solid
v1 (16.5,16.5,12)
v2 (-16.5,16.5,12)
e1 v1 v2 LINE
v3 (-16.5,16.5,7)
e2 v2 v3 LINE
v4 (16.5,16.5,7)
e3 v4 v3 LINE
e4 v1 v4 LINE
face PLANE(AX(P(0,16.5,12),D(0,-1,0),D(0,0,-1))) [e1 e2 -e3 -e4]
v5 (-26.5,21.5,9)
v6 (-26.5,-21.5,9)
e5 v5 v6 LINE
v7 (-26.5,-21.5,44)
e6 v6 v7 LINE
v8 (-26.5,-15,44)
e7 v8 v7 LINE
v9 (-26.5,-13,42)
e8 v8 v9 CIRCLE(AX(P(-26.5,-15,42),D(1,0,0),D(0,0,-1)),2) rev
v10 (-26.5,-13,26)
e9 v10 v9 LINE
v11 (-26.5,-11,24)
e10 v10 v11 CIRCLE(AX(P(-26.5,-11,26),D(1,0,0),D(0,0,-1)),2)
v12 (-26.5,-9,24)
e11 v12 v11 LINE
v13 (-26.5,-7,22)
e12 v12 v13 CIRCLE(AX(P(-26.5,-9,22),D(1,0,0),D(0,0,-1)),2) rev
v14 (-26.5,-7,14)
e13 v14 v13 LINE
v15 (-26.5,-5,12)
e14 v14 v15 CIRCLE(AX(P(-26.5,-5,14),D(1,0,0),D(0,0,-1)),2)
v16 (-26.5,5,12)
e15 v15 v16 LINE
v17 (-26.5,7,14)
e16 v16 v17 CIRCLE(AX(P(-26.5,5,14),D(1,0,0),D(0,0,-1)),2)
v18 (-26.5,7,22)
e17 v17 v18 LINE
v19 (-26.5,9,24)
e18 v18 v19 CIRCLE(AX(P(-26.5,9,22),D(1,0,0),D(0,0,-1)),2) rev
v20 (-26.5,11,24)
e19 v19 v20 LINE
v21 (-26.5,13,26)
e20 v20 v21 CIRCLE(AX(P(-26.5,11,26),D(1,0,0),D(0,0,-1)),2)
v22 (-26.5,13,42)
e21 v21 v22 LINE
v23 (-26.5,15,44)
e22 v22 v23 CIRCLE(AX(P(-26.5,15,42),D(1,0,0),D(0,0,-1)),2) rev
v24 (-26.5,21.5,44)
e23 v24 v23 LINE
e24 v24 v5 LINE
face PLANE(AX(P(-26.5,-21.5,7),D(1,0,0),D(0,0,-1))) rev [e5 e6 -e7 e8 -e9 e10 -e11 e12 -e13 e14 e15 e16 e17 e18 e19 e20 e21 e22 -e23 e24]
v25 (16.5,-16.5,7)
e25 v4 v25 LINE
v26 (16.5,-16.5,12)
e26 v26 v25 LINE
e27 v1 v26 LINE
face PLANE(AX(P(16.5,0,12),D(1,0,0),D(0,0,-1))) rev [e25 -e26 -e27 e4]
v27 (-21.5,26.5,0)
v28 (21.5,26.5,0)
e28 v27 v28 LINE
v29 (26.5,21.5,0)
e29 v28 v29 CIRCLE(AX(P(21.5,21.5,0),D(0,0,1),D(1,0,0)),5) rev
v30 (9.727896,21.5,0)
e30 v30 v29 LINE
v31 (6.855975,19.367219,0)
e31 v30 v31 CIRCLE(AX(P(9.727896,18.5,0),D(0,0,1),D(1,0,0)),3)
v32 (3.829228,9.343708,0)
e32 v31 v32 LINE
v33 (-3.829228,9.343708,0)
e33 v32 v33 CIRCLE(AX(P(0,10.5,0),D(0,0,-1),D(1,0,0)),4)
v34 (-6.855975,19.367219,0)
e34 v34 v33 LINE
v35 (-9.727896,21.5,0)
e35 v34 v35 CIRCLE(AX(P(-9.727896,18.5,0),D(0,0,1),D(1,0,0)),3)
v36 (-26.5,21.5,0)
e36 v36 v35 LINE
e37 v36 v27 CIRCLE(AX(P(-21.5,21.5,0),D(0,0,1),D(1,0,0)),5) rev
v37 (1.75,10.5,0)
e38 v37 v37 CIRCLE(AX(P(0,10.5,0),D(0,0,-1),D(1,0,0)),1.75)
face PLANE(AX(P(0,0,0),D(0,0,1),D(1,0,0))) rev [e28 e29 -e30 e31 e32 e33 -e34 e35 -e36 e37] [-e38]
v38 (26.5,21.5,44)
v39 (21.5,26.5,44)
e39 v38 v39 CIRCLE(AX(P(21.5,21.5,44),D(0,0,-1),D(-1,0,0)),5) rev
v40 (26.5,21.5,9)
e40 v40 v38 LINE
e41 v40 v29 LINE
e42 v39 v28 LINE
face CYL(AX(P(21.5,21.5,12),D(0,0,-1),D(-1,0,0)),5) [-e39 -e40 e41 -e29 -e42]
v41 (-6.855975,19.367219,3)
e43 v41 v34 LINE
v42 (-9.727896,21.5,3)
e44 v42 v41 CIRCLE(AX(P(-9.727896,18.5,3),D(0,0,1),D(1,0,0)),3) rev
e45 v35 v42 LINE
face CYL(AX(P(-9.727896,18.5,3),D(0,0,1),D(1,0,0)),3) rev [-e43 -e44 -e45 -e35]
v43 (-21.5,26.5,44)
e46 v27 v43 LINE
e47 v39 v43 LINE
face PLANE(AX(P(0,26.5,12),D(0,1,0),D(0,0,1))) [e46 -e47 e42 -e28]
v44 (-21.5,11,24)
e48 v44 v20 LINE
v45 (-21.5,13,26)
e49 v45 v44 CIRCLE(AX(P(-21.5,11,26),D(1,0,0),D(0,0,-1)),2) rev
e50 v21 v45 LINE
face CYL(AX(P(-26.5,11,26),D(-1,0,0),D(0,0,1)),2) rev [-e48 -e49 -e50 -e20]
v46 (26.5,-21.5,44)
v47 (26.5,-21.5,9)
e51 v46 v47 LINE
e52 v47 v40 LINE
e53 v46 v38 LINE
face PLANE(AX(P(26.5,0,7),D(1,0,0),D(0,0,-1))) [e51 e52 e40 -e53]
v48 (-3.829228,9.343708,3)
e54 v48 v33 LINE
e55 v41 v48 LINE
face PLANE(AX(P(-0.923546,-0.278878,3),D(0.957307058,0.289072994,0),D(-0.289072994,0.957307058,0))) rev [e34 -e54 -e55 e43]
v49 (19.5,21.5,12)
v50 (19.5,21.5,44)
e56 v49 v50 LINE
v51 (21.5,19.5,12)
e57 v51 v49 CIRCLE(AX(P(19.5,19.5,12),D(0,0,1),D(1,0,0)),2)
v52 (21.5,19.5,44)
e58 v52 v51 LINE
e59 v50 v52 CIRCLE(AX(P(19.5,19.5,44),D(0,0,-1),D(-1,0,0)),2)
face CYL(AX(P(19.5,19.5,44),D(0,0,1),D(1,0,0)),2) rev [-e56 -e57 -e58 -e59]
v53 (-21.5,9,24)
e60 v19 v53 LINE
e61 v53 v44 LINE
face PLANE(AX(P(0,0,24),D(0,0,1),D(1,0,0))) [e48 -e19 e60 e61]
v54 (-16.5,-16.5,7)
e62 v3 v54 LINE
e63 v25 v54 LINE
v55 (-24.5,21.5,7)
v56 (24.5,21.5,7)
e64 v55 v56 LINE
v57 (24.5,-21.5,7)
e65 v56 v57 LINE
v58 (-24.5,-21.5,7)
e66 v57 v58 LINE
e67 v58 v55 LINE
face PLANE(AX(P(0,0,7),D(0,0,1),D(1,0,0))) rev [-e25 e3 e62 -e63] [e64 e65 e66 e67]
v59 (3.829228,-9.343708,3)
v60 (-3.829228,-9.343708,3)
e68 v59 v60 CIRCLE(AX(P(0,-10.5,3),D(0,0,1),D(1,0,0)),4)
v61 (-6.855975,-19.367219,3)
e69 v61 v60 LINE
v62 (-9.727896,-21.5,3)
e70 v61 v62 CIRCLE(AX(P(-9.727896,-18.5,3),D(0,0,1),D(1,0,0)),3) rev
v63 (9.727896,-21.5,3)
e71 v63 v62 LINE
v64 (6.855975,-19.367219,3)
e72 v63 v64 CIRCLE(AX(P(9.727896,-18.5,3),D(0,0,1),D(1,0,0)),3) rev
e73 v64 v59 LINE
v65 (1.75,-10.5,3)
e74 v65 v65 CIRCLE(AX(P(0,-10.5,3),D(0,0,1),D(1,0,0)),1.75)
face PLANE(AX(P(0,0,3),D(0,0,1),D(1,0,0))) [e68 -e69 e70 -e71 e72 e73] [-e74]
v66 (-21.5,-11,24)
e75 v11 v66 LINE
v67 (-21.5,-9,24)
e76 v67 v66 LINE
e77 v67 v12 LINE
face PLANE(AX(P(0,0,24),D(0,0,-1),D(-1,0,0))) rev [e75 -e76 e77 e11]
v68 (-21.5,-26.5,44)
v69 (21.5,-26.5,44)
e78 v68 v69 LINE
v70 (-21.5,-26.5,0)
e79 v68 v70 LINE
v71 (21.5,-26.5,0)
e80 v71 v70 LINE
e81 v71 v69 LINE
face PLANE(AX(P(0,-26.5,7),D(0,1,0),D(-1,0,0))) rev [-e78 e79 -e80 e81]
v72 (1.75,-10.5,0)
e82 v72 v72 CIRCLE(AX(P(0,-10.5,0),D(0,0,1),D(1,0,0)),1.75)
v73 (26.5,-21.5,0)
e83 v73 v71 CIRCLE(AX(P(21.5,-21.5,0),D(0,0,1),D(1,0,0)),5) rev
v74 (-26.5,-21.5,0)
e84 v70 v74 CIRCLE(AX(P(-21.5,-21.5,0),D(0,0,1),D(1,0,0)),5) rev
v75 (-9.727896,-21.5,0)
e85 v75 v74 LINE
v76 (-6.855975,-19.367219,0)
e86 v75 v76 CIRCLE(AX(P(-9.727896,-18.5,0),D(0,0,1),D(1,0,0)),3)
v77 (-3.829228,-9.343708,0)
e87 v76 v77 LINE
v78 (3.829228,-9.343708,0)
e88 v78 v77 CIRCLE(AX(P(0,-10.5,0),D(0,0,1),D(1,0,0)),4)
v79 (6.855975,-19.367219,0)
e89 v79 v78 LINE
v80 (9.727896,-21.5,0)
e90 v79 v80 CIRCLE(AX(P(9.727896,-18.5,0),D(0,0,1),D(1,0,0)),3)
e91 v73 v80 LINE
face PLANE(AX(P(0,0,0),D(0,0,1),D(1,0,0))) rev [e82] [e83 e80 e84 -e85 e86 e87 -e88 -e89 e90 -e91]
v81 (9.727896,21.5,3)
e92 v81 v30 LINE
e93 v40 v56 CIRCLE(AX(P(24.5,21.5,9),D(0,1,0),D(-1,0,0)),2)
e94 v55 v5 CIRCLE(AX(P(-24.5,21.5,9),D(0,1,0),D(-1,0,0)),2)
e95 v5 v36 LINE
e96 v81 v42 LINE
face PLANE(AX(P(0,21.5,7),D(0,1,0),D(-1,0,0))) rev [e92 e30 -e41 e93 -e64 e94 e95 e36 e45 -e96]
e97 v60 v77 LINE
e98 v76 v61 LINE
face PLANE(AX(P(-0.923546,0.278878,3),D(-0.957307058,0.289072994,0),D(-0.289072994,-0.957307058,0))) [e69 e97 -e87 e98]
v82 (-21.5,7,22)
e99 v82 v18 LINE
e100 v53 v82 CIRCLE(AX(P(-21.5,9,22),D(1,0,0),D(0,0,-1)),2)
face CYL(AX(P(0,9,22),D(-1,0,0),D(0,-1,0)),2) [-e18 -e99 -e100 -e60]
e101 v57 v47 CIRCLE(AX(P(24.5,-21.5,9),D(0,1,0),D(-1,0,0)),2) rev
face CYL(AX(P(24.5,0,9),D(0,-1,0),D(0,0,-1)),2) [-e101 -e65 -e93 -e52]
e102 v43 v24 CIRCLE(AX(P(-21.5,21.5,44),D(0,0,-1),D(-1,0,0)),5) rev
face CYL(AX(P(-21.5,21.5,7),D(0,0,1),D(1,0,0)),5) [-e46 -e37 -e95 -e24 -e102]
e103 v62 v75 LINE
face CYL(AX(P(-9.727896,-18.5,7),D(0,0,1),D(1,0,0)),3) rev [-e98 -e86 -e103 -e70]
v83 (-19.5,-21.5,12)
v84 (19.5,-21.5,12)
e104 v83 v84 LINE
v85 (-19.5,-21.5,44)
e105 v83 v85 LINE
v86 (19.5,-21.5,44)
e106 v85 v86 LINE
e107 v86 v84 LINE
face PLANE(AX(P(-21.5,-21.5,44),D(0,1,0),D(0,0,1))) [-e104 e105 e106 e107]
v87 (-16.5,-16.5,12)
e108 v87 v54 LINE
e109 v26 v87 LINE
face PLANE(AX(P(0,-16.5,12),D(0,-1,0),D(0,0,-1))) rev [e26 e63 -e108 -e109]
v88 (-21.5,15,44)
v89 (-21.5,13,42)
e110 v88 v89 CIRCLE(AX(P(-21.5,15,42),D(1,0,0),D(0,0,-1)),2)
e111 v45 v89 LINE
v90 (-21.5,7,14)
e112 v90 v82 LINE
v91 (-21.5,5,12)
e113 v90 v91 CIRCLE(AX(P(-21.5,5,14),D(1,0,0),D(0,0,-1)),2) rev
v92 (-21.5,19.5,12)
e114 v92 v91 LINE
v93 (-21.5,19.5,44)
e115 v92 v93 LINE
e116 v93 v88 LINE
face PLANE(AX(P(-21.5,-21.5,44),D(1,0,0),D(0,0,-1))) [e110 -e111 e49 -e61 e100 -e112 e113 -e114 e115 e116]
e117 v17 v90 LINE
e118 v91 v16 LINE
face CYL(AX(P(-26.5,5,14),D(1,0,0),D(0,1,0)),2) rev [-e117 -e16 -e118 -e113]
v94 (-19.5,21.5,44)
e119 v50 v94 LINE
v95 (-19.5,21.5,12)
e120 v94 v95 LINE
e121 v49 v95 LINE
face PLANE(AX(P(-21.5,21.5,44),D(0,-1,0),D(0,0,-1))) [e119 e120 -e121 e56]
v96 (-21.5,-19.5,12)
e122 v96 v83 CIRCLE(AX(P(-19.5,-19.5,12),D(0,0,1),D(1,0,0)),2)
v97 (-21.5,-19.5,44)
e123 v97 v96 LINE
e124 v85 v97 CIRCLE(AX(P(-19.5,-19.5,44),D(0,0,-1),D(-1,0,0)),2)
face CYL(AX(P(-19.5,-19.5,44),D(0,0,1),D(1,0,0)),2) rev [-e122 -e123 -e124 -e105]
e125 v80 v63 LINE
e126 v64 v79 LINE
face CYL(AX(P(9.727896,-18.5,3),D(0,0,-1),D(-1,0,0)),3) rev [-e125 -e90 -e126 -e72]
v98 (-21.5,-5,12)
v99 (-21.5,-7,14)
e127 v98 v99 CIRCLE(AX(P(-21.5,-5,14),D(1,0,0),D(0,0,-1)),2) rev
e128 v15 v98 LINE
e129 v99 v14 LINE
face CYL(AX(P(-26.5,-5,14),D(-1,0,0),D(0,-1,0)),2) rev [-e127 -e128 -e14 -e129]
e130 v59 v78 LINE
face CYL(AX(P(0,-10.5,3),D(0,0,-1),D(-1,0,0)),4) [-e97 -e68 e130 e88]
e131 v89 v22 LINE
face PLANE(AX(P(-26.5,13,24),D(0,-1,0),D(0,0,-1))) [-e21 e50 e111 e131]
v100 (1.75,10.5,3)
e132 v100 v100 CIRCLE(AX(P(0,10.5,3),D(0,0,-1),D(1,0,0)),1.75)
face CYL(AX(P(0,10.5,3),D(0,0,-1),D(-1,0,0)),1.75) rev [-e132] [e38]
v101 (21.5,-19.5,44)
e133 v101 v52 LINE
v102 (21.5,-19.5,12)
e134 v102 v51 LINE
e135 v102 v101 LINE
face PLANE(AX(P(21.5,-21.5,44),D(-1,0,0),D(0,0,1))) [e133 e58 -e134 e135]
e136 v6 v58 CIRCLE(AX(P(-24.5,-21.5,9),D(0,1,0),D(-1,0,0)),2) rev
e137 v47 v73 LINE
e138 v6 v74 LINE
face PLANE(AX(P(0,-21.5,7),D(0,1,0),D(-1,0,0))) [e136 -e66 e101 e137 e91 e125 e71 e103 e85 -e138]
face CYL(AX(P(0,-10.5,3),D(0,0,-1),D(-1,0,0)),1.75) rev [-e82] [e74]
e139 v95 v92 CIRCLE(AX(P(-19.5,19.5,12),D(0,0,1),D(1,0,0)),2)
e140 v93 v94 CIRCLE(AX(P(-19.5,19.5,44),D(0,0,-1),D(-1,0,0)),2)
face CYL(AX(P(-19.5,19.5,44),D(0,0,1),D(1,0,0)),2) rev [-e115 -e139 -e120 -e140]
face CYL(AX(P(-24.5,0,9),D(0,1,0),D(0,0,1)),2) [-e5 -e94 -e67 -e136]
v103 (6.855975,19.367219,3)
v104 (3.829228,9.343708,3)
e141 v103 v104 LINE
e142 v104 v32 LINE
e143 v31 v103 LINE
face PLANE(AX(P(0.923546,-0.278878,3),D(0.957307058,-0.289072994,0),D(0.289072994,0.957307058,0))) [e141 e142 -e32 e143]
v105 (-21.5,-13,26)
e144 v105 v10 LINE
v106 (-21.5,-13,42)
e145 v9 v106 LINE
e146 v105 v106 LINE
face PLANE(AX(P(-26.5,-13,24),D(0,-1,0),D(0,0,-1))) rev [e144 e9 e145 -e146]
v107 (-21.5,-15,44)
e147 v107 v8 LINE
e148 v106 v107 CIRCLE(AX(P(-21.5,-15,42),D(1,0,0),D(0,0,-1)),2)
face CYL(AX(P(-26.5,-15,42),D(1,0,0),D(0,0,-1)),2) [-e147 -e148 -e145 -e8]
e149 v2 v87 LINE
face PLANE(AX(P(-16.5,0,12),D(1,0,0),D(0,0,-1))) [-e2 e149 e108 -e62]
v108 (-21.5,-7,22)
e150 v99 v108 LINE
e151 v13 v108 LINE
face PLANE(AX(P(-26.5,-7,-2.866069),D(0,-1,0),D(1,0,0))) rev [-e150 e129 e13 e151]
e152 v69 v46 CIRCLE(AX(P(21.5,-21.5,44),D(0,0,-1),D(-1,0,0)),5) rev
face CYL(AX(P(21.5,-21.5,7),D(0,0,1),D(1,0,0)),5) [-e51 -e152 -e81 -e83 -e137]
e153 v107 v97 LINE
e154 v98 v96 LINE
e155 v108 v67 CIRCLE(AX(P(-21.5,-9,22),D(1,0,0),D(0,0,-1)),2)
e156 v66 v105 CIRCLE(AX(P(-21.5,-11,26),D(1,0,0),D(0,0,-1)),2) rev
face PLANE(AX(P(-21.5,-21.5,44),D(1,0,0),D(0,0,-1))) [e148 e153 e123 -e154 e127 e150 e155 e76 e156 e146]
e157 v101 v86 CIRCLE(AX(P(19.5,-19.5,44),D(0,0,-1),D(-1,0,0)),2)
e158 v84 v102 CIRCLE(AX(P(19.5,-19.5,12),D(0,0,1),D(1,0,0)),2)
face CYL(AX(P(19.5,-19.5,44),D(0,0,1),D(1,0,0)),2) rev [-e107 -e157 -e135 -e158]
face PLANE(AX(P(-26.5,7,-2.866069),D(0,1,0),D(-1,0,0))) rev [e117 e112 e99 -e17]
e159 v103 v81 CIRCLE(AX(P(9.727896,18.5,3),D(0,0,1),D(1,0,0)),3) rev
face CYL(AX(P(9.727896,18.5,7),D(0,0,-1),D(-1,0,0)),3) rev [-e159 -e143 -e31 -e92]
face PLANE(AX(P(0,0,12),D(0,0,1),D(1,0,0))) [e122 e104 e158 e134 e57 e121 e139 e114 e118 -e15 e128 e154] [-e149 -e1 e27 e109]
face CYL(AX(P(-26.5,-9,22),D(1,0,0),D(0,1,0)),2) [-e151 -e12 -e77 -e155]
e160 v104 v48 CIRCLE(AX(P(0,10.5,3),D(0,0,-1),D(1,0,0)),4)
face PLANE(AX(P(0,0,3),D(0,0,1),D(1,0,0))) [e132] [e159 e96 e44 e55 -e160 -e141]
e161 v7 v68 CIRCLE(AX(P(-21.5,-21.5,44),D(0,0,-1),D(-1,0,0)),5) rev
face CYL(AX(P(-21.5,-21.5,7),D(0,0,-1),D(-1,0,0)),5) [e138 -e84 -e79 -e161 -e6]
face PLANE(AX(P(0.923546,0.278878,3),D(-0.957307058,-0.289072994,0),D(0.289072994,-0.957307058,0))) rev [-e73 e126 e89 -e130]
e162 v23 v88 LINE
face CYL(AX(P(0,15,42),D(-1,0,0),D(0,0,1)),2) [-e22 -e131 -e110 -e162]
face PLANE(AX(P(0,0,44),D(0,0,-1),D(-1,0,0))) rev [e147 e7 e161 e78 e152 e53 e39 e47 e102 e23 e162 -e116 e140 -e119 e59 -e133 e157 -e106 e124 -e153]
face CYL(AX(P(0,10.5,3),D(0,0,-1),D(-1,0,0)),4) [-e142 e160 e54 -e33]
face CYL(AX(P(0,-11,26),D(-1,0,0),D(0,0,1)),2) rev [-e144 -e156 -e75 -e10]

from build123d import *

# Parameters (mm, degrees)
CROQUIS1_W                = 5
CROQUIS1_H                = 53
SALIENTE_EXTRUIR1_DEPTH   = 7
SALIENTE_EXTRUIR1_2_DEPTH = 7
CROQUIS3_W                = 53
CROQUIS3_H                = 48
CROQUIS3_W_2              = 33
CROQUIS3_H_2              = 33
CROQUIS3_H_3              = 5
SALIENTE_EXTRUIR2_DEPTH   = 5
CROQUIS4_W                = 53
CROQUIS4_H                = 53
CROQUIS4_W_2              = 43
CROQUIS4_H_2              = 43
SALIENTE_EXTRUIR3_DEPTH   = 32
REDONDEO1_R               = 2
REDONDEO2_R               = 5
CROQUIS5_W                = 5
CROQUIS5_H                = 14
CORTAR_EXTRUIR1_DEPTH     = 32
CROQUIS6_W                = 5
CROQUIS6_H                = 6
CORTAR_EXTRUIR2_DEPTH     = 20
REDONDEO3_R               = 2
CROQUIS7_R                = 4
CROQUIS7_R_2              = 1.75
SALIENTE_EXTRUIR4_DEPTH   = 3
REDONDEO4_R               = 3
REDONDEO7_R               = 3


with BuildPart() as part:
    # Croquis1 → Saliente-Extruir1 (new body)
    with BuildSketch(Plane(origin=(0, 0, 0), x_dir=(0, 1, 0), z_dir=(0, 0, 1))):
        with Locations((-24, 0)):
            Rectangle(CROQUIS1_W, CROQUIS1_H)
    extrude(amount=SALIENTE_EXTRUIR1_DEPTH)



with BuildPart() as body_2:
    # Croquis1 → Saliente-Extruir1 2 (new body)
    with BuildSketch(Plane(origin=(0, 0, 0), x_dir=(0, 1, 0), z_dir=(0, 0, 1))):
        with Locations((24, 0)):
            Rectangle(CROQUIS1_W, CROQUIS1_H)
    extrude(amount=SALIENTE_EXTRUIR1_2_DEPTH)


with BuildPart() as part_1:
    add(part.part)

    add(body_2.part)  # Saliente-Extruir2 merges body 2
    # Croquis3 → Saliente-Extruir2 (add)
    # profile 1 of 2: a face of its own
    with BuildSketch(Plane.XY.offset(7)):
        with Locations((0, 2.5)):
            Rectangle(CROQUIS3_W, CROQUIS3_H)
        Rectangle(CROQUIS3_W_2, CROQUIS3_H_2, mode=Mode.SUBTRACT)
    # profile 2 of 2: a face of its own
    with BuildSketch(Plane.XY.offset(7)):
        with Locations((0, -24)):
            Rectangle(CROQUIS3_W, CROQUIS3_H_3)
    extrude(amount=SALIENTE_EXTRUIR2_DEPTH)

    # Croquis4 → Saliente-Extruir3 (add)
    with BuildSketch(Plane.XY.offset(12)):
        Rectangle(CROQUIS4_W, CROQUIS4_H)
        Rectangle(CROQUIS4_W_2, CROQUIS4_H_2, mode=Mode.SUBTRACT)
    extrude(amount=SALIENTE_EXTRUIR3_DEPTH)

    # Redondeo1
    redondeo1_edges = [part_1.edges().sort_by_distance(p)[0] for p in [
        (21.5, 21.5, 28),
        (-21.5, 21.5, 28),
        (-21.5, -21.5, 28),
        (21.5, -21.5, 28),
    ]]
    fillet(redondeo1_edges, radius=REDONDEO1_R)

    # Redondeo2
    redondeo2_edges = [part_1.edges().sort_by_distance(p)[0] for p in [
        (-26.5, 26.5, 22),
        (26.5, 26.5, 22),
        (26.5, -26.5, 22),
        (-26.5, -26.5, 22),
    ]]
    fillet(redondeo2_edges, radius=REDONDEO2_R - 0.0001)  # a hair under: the kernel refuses the full size

    # Croquis5 → Cortar-Extruir1 (cut)
    with BuildSketch(Plane.XY.offset(44)):
        with Locations((-24, 0)):
            Rectangle(CROQUIS5_W, CROQUIS5_H)
    extrude(amount=-CORTAR_EXTRUIR1_DEPTH, mode=Mode.SUBTRACT)

    # Croquis6 → Cortar-Extruir2 (cut)
    with BuildSketch(Plane.XY.offset(44)):
        with Locations((-24, 10)):
            Rectangle(CROQUIS6_W, CROQUIS6_H)
        with Locations((-24, -10)):
            Rectangle(CROQUIS6_W, CROQUIS6_H)
    extrude(amount=-CORTAR_EXTRUIR2_DEPTH, mode=Mode.SUBTRACT)

    # Redondeo3
    redondeo3_edges = [part_1.edges().sort_by_distance(p)[0] for p in [
        (-24, 7, 12),
        (-24, -7, 12),
        (-24, -13, 24),
        (-24, -7, 24),
        (-24, -13, 44),
        (-24, 13, 44),
        (-24, 7, 24),
        (-24, 13, 24),
        (-26.5, 0, 7),
        (26.5, 0, 7),
    ]]
    fillet(redondeo3_edges, radius=REDONDEO3_R)

    # Croquis7 → Saliente-Extruir4 (add)
    # profile 1 of 2: a face of its own
    with BuildSketch(Plane(origin=(0, 0, 0), x_dir=(0, 1, 0), z_dir=(0, 0, 1))):
        with BuildLine():
            Line((-21.5, 7.5), (-21.5, -7.5))
            Line((-21.5, -7.5), (-9.343708023, -3.829228233))
            ThreePointArc((-9.343708023, -3.829228233), (-14.5, 0), (-9.343708023, 3.829228233))
            Line((-9.343708023, 3.829228233), (-21.5, 7.5))
        make_face()
    # profile 2 of 2: a face of its own
    with BuildSketch(Plane(origin=(0, 0, 0), x_dir=(0, 1, 0), z_dir=(0, 0, 1))):
        with Locations((-10.5, 0)):
            Circle(CROQUIS7_R)
        with Locations(Location((-10.5, 0, 0), (0, 0, 270))):
            Circle(CROQUIS7_R_2, mode=Mode.SUBTRACT)
    saliente_extruir4 = extrude(amount=SALIENTE_EXTRUIR4_DEPTH)

    # Redondeo4
    redondeo4_edges = [part_1.edges().sort_by_distance(p)[0] for p in [
        (7.5, -21.5, 1.5),
        (-7.5, -21.5, 1.5),
    ]]
    fillet(redondeo4_edges, radius=REDONDEO4_R)

    # Simetría5: Saliente-Extruir4 across plane
    add(saliente_extruir4.mirror(Plane.ZX))

    # Redondeo7
    redondeo7_edges = [part_1.edges().sort_by_distance(p)[0] for p in [
        (7.5, 21.5, 1.5),
        (-7.5, 21.5, 1.5),
    ]]
    fillet(redondeo7_edges, radius=REDONDEO7_R)


solid = part_1.part
